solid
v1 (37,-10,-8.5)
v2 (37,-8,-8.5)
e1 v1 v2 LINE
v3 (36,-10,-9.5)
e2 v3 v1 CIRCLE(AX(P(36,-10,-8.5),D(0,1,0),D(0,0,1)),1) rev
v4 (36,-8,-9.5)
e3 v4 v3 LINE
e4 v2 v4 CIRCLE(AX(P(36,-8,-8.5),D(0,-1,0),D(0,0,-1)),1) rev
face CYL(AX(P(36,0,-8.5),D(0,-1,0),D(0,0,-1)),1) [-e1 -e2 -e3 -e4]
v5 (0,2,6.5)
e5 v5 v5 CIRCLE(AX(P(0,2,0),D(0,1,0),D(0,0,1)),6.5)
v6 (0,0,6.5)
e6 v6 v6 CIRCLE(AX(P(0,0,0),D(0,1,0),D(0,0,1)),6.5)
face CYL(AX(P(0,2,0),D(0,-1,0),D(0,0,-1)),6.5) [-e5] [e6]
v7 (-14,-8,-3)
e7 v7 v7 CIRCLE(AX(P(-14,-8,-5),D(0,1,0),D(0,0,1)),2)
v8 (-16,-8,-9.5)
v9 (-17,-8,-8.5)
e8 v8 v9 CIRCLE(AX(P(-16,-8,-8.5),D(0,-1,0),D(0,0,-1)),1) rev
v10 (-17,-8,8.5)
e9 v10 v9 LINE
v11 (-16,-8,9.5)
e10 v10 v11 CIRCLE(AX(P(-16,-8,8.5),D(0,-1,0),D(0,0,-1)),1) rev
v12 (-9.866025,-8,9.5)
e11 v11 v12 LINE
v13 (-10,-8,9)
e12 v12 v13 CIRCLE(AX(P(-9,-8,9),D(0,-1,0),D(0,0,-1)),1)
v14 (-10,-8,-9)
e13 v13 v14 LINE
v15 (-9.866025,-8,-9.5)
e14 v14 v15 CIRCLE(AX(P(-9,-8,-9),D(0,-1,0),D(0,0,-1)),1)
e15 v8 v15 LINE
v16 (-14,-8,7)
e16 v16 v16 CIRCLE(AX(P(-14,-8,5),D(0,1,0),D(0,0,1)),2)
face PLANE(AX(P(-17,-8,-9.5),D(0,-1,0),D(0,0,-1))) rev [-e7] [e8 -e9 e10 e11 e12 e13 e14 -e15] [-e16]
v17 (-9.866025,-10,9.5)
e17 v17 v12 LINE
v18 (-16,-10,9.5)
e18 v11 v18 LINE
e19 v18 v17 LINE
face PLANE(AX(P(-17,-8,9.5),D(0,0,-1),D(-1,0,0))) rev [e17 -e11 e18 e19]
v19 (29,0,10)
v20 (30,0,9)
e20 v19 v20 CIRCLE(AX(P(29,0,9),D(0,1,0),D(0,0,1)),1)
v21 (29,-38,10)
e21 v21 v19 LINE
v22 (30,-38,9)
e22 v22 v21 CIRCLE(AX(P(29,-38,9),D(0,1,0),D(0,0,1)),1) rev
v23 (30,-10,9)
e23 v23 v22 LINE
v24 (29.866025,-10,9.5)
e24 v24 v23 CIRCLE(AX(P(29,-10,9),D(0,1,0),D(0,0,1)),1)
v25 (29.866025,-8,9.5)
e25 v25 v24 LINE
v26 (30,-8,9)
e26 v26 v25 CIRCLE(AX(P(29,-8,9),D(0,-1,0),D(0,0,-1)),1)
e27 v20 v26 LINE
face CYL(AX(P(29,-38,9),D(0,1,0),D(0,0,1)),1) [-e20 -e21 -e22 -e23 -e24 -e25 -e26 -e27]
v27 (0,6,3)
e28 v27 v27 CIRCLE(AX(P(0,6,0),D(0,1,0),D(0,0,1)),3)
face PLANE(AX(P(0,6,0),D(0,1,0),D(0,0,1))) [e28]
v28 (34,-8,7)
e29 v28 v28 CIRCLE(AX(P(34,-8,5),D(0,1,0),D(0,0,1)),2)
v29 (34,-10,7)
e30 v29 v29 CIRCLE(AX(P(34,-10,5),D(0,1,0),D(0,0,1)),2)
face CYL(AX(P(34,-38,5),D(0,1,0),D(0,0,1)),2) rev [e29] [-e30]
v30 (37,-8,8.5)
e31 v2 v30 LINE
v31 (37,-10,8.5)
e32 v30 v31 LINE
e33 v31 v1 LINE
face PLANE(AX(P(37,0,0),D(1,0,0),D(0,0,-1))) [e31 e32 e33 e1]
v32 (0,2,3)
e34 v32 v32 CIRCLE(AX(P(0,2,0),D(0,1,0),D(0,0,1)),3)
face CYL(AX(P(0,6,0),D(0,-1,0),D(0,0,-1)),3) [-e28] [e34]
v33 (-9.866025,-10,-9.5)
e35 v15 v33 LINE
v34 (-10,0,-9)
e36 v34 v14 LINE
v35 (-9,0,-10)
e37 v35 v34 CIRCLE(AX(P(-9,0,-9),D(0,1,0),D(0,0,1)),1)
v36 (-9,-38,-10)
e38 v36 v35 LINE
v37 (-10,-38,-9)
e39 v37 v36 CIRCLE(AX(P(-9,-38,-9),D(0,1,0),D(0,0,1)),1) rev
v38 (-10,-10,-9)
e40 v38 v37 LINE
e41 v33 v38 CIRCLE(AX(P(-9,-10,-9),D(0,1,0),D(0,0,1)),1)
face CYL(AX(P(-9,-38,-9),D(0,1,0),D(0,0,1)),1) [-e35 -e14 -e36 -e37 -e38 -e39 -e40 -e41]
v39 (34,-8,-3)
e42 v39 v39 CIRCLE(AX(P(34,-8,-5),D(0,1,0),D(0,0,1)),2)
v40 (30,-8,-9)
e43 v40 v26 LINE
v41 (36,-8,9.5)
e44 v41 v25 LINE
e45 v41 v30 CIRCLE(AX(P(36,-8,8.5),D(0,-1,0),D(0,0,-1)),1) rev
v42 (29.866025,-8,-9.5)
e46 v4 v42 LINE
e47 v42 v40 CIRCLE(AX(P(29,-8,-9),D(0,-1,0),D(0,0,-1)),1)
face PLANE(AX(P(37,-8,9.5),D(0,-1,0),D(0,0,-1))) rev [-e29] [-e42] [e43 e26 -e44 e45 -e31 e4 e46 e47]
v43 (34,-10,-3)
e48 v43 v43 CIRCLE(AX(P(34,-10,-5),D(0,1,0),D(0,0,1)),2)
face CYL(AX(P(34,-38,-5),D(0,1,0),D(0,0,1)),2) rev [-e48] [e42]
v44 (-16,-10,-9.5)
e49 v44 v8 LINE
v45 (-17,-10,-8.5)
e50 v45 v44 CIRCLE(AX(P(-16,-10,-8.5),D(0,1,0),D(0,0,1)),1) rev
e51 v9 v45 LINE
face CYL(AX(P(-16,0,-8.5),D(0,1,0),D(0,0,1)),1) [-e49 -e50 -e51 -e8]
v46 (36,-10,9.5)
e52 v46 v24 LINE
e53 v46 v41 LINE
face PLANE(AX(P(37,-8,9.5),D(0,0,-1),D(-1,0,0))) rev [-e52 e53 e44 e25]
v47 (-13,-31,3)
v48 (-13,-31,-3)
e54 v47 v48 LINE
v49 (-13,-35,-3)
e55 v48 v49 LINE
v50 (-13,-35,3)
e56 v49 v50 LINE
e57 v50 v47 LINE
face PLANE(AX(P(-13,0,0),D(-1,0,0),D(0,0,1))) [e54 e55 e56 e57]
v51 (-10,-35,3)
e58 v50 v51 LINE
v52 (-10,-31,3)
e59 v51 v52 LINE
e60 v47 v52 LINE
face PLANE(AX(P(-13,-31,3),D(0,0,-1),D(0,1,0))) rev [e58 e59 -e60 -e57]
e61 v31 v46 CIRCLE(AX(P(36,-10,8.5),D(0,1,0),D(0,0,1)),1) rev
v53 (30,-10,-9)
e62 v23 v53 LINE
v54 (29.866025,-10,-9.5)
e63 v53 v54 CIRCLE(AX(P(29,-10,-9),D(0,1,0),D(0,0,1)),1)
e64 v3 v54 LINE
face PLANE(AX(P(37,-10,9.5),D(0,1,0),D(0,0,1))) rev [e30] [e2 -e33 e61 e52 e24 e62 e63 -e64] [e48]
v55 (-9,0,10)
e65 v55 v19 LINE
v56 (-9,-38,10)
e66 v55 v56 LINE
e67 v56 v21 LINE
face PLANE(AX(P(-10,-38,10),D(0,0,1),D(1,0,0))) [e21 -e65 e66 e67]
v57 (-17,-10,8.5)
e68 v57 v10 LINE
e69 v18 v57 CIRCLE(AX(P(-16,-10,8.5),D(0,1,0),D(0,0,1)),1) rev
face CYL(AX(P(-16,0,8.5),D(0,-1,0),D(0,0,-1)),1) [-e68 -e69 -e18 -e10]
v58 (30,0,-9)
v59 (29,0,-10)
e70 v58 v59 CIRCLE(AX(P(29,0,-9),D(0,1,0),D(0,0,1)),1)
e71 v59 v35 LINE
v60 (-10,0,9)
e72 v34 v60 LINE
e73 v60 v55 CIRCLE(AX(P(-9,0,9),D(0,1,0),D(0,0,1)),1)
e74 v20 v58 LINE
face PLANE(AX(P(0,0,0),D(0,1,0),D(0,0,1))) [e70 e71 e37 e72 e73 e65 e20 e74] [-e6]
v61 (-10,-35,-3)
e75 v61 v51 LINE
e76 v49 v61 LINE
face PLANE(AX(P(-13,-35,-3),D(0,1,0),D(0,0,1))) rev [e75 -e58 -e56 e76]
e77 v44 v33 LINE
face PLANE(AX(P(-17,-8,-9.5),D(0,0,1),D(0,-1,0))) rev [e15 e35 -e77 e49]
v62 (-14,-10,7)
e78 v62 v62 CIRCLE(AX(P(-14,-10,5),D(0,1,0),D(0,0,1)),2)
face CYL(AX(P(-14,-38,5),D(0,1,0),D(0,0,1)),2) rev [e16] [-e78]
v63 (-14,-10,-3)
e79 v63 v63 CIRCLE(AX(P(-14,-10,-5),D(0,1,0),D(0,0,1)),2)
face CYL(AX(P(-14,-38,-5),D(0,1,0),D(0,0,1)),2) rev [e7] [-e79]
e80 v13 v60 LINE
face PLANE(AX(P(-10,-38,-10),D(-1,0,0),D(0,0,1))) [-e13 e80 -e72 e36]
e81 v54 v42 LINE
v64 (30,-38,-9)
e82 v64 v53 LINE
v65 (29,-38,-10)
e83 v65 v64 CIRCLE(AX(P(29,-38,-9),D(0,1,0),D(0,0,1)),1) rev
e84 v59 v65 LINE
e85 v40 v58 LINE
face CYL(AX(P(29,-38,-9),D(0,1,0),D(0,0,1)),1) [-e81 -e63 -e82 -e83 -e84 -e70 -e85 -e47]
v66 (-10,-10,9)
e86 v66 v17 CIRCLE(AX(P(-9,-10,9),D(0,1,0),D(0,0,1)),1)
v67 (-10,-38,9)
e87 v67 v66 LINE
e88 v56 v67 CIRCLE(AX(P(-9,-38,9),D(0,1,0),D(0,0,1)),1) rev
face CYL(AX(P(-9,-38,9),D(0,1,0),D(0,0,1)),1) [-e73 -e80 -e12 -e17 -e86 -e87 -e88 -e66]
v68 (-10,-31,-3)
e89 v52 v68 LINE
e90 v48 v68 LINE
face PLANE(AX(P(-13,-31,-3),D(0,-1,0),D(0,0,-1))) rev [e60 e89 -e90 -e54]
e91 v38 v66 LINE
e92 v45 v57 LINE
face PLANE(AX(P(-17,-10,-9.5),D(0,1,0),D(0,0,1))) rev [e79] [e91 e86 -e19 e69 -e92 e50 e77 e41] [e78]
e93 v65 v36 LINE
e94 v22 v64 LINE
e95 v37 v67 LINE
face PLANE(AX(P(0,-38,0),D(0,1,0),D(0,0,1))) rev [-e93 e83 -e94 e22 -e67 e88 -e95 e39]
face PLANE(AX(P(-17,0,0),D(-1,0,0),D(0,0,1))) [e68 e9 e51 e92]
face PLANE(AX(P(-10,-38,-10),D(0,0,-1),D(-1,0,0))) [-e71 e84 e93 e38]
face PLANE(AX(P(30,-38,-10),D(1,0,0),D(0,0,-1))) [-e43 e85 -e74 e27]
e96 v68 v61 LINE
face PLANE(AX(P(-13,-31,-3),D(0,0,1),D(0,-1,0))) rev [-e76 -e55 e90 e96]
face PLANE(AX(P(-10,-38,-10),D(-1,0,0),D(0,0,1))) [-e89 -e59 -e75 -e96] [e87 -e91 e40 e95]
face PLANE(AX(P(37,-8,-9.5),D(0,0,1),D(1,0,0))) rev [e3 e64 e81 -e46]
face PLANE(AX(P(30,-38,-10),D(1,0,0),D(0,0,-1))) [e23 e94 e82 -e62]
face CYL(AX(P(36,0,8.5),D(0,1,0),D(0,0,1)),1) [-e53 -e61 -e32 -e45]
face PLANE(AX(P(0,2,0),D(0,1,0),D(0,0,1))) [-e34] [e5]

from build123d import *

# Parameters (mm, degrees)
SKETCH_1_W          = 40
SKETCH_1_H          = 20
EXTRUDE_455_DEPTH   = 38
SKETCH_2_R          = 6.5
EXTRUDE_589_DEPTH   = 2
SKETCH_3_R          = 3
EXTRUDE_676_DEPTH   = 4
SKETCH_4_W          = 19
SKETCH_4_H          = 2
EXTRUDE_1_DEPTH     = 7
SKETCH_6_W          = 19
SKETCH_6_H          = 2
EXTRUDE_2_DEPTH     = 7
SKETCH_7_R          = 2
CUT_EXTRUDE_1_DEPTH = 49.672374095
SKETCH_8_R          = 2
CUT_EXTRUDE_2_DEPTH = 49.672374095
SKETCH_9_W          = 6
SKETCH_9_H          = 4
EXTRUDE_1701_DEPTH  = 3
FILLET_1_R          = 1


with BuildPart() as part:
    # Эскиз1 → Extrude 455 (new body)
    with BuildSketch(Plane(origin=(0, 0, 0), x_dir=(1, 0, 0), z_dir=(0, 1, 0))):
        with Locations((10, 0)):
            Rectangle(SKETCH_1_W, SKETCH_1_H)
    extrude(amount=-EXTRUDE_455_DEPTH)

    # Эскиз2 → Extrude 589 (add)
    with BuildSketch(Plane(origin=(0, 0, 0), x_dir=(1, 0, 0), z_dir=(0, 1, 0))):
        with Locations(Location((0, 0, 0), (0, 0, 270))):
            Circle(SKETCH_2_R)
    extrude(amount=EXTRUDE_589_DEPTH)

    # Эскиз3 → Extrude 676 (add)
    with BuildSketch(Plane(origin=(0, 2, 0), x_dir=(1, 0, 0), z_dir=(0, 1, 0))):
        with Locations(Location((0, 0, 0), (0, 0, 270))):
            Circle(SKETCH_3_R)
    extrude(amount=EXTRUDE_676_DEPTH)

    # Эскиз4 → крепления 1 (add)
    with BuildSketch(Plane(origin=(30, 0, 0), x_dir=(0, 0, -1), z_dir=(1, 0, 0))):
        with Locations((0, -9)):
            Rectangle(SKETCH_4_W, SKETCH_4_H)
    extrude(amount=EXTRUDE_1_DEPTH)

    # Эскиз6 → крепления 2 (add)
    with BuildSketch(Plane.ZY.offset(10)):
        with Locations((0, -9)):
            Rectangle(SKETCH_6_W, SKETCH_6_H)
    extrude(amount=EXTRUDE_2_DEPTH)

    # Эскиз7 → отверстия 1 (cut, through all)
    with BuildSketch(Plane(origin=(0, -8, 0), x_dir=(1, 0, 0), z_dir=(0, 1, 0))):
        with Locations(Location((34, 5, 0), (0, 0, 270))):
            Circle(SKETCH_7_R)
        with Locations(Location((34, -5, 0), (0, 0, 270))):
            Circle(SKETCH_7_R)
    extrude(amount=-CUT_EXTRUDE_1_DEPTH, mode=Mode.SUBTRACT)

    # Эскиз8 → отверстия 2 (cut, through all)
    with BuildSketch(Plane(origin=(0, -8, 0), x_dir=(1, 0, 0), z_dir=(0, 1, 0))):
        with Locations(Location((-14, 5, 0), (0, 0, 270))):
            Circle(SKETCH_8_R)
        with Locations(Location((-14, -5, 0), (0, 0, 270))):
            Circle(SKETCH_8_R)
    extrude(amount=-CUT_EXTRUDE_2_DEPTH, mode=Mode.SUBTRACT)

    # Эскиз9 → Extrude 1701 (add)
    with BuildSketch(Plane.ZY.offset(10)):
        with Locations((0, -33)):
            Rectangle(SKETCH_9_W, SKETCH_9_H)
    extrude(amount=EXTRUDE_1701_DEPTH)

    # Скругление1
    # the kernel refuses this fillet: 1 mm, written as the material it takes off along each edge
    with BuildSketch(Plane(origin=(30, 2.5, 10), x_dir=(0, 0, -1), z_dir=(0, -1, 0))) as fillet_1_piece_1_section:
        with BuildLine():
            CenterArc((FILLET_1_R, -FILLET_1_R), FILLET_1_R, 90, 90)
            Line((0, -FILLET_1_R), (0, 0))
            Line((0, 0), (FILLET_1_R, 0))
        make_face()
    fillet_1_piece_1 = extrude(amount=43, mode=Mode.PRIVATE)
    fillet_1_piece_1 = split(fillet_1_piece_1, bisect_by=Plane(origin=(29.975991618, -8, 9.336749215), z_dir=(0, 1, 0)), keep=Keep.TOP, mode=Mode.PRIVATE)
    fillet_1_piece_1 = split(fillet_1_piece_1, bisect_by=Plane(origin=(29.975991618, -2.75, 9.5), z_dir=(0, 0, -1)), keep=Keep.TOP, mode=Mode.PRIVATE)
    add(fillet_1_piece_1, mode=Mode.SUBTRACT)
    with BuildSketch(Plane(origin=(30, 2.5, 10), x_dir=(0, 0, -1), z_dir=(0, -1, 0))) as fillet_1_piece_2_section:
        with BuildLine():
            CenterArc((FILLET_1_R, -FILLET_1_R), FILLET_1_R, 90, 90)
            Line((0, -FILLET_1_R), (0, 0))
            Line((0, 0), (FILLET_1_R, 0))
        make_face()
    fillet_1_piece_2 = extrude(amount=43, mode=Mode.PRIVATE)
    fillet_1_piece_2 = split(fillet_1_piece_2, bisect_by=Plane(origin=(29.74487994, -8, 9.835608236), z_dir=(0, 1, 0)), keep=Keep.TOP, mode=Mode.PRIVATE)
    fillet_1_piece_2 = split(fillet_1_piece_2, bisect_by=Plane(origin=(29.74487994, -2.75, 9.5), z_dir=(0, 0, 1)), keep=Keep.TOP, mode=Mode.PRIVATE)
    add(fillet_1_piece_2, mode=Mode.SUBTRACT)
    with BuildSketch(Plane(origin=(30, 2.5, 10), x_dir=(0, 0, -1), z_dir=(0, -1, 0))) as fillet_1_piece_3_section:
        with BuildLine():
            CenterArc((FILLET_1_R, -FILLET_1_R), FILLET_1_R, 90, 90)
            Line((0, -FILLET_1_R), (0, 0))
            Line((0, 0), (FILLET_1_R, 0))
        make_face()
    fillet_1_piece_3 = extrude(amount=43, mode=Mode.PRIVATE)
    fillet_1_piece_3 = split(fillet_1_piece_3, bisect_by=Plane(origin=(29.74487994, -8, 9.835608236), z_dir=(0, -1, 0)), keep=Keep.TOP, mode=Mode.PRIVATE)
    fillet_1_piece_3 = split(fillet_1_piece_3, bisect_by=Plane(origin=(29.74487994, -10, 9.835608236), z_dir=(0, 1, 0)), keep=Keep.TOP, mode=Mode.PRIVATE)
    fillet_1_piece_3 = split(fillet_1_piece_3, bisect_by=Plane(origin=(29.74487994, -9, 9.5), z_dir=(0, 0, 1)), keep=Keep.TOP, mode=Mode.PRIVATE)
    add(fillet_1_piece_3, mode=Mode.SUBTRACT)
    with BuildSketch(Plane(origin=(30, 2.5, 10), x_dir=(0, 0, -1), z_dir=(0, -1, 0))) as fillet_1_piece_4_section:
        with BuildLine():
            CenterArc((FILLET_1_R, -FILLET_1_R), FILLET_1_R, 90, 90)
            Line((0, -FILLET_1_R), (0, 0))
            Line((0, 0), (FILLET_1_R, 0))
        make_face()
    fillet_1_piece_4 = extrude(amount=43, mode=Mode.PRIVATE)
    fillet_1_piece_4 = split(fillet_1_piece_4, bisect_by=Plane(origin=(29.975991618, -10, 9.336749215), z_dir=(0, -1, 0)), keep=Keep.TOP, mode=Mode.PRIVATE)
    fillet_1_piece_4 = split(fillet_1_piece_4, bisect_by=Plane(origin=(29.975991618, -25.25, 9.5), z_dir=(0, 0, -1)), keep=Keep.TOP, mode=Mode.PRIVATE)
    add(fillet_1_piece_4, mode=Mode.SUBTRACT)
    with BuildSketch(Plane(origin=(30, 2.5, 10), x_dir=(0, 0, -1), z_dir=(0, -1, 0))) as fillet_1_piece_5_section:
        with BuildLine():
            CenterArc((FILLET_1_R, -FILLET_1_R), FILLET_1_R, 90, 90)
            Line((0, -FILLET_1_R), (0, 0))
            Line((0, 0), (FILLET_1_R, 0))
        make_face()
    fillet_1_piece_5 = extrude(amount=43, mode=Mode.PRIVATE)
    fillet_1_piece_5 = split(fillet_1_piece_5, bisect_by=Plane(origin=(29.74487994, -10, 9.835608236), z_dir=(0, -1, 0)), keep=Keep.TOP, mode=Mode.PRIVATE)
    fillet_1_piece_5 = split(fillet_1_piece_5, bisect_by=Plane(origin=(29.74487994, -25.25, 9.5), z_dir=(0, 0, 1)), keep=Keep.TOP, mode=Mode.PRIVATE)
    add(fillet_1_piece_5, mode=Mode.SUBTRACT)
    with BuildSketch(Plane(origin=(30, 2.5, -10), x_dir=(-1, 0, 0), z_dir=(0, -1, 0))) as fillet_1_piece_6_section:
        with BuildLine():
            CenterArc((FILLET_1_R, -FILLET_1_R), FILLET_1_R, 90, 90)
            Line((0, -FILLET_1_R), (0, 0))
            Line((0, 0), (FILLET_1_R, 0))
        make_face()
    fillet_1_piece_6 = extrude(amount=43, mode=Mode.PRIVATE)
    fillet_1_piece_6 = split(fillet_1_piece_6, bisect_by=Plane(origin=(29.74487994, -8, -9.835608236), z_dir=(0, 1, 0)), keep=Keep.TOP, mode=Mode.PRIVATE)
    fillet_1_piece_6 = split(fillet_1_piece_6, bisect_by=Plane(origin=(29.74487994, -2.75, -9.5), z_dir=(0, 0, -1)), keep=Keep.TOP, mode=Mode.PRIVATE)
    add(fillet_1_piece_6, mode=Mode.SUBTRACT)
    with BuildSketch(Plane(origin=(30, 2.5, -10), x_dir=(-1, 0, 0), z_dir=(0, -1, 0))) as fillet_1_piece_7_section:
        with BuildLine():
            CenterArc((FILLET_1_R, -FILLET_1_R), FILLET_1_R, 90, 90)
            Line((0, -FILLET_1_R), (0, 0))
            Line((0, 0), (FILLET_1_R, 0))
        make_face()
    fillet_1_piece_7 = extrude(amount=43, mode=Mode.PRIVATE)
    fillet_1_piece_7 = split(fillet_1_piece_7, bisect_by=Plane(origin=(29.975991618, -8, -9.336749215), z_dir=(0, 1, 0)), keep=Keep.TOP, mode=Mode.PRIVATE)
    fillet_1_piece_7 = split(fillet_1_piece_7, bisect_by=Plane(origin=(29.975991618, -2.75, -9.5), z_dir=(0, 0, 1)), keep=Keep.TOP, mode=Mode.PRIVATE)
    add(fillet_1_piece_7, mode=Mode.SUBTRACT)
    with BuildSketch(Plane(origin=(30, 2.5, -10), x_dir=(-1, 0, 0), z_dir=(0, -1, 0))) as fillet_1_piece_8_section:
        with BuildLine():
            CenterArc((FILLET_1_R, -FILLET_1_R), FILLET_1_R, 90, 90)
            Line((0, -FILLET_1_R), (0, 0))
            Line((0, 0), (FILLET_1_R, 0))
        make_face()
    fillet_1_piece_8 = extrude(amount=43, mode=Mode.PRIVATE)
    fillet_1_piece_8 = split(fillet_1_piece_8, bisect_by=Plane(origin=(29.74487994, -8, -9.835608236), z_dir=(0, -1, 0)), keep=Keep.TOP, mode=Mode.PRIVATE)
    fillet_1_piece_8 = split(fillet_1_piece_8, bisect_by=Plane(origin=(29.74487994, -9, -9.5), z_dir=(0, 0, -1)), keep=Keep.TOP, mode=Mode.PRIVATE)
    fillet_1_piece_8 = split(fillet_1_piece_8, bisect_by=Plane(origin=(29.74487994, -10, -9.835608236), z_dir=(0, 1, 0)), keep=Keep.TOP, mode=Mode.PRIVATE)
    add(fillet_1_piece_8, mode=Mode.SUBTRACT)
    with BuildSketch(Plane(origin=(30, 2.5, -10), x_dir=(-1, 0, 0), z_dir=(0, -1, 0))) as fillet_1_piece_9_section:
        with BuildLine():
            CenterArc((FILLET_1_R, -FILLET_1_R), FILLET_1_R, 90, 90)
            Line((0, -FILLET_1_R), (0, 0))
            Line((0, 0), (FILLET_1_R, 0))
        make_face()
    fillet_1_piece_9 = extrude(amount=43, mode=Mode.PRIVATE)
    fillet_1_piece_9 = split(fillet_1_piece_9, bisect_by=Plane(origin=(29.74487994, -25.25, -9.5), z_dir=(0, 0, -1)), keep=Keep.TOP, mode=Mode.PRIVATE)
    fillet_1_piece_9 = split(fillet_1_piece_9, bisect_by=Plane(origin=(29.74487994, -10, -9.835608236), z_dir=(0, -1, 0)), keep=Keep.TOP, mode=Mode.PRIVATE)
    add(fillet_1_piece_9, mode=Mode.SUBTRACT)
    with BuildSketch(Plane(origin=(30, 2.5, -10), x_dir=(-1, 0, 0), z_dir=(0, -1, 0))) as fillet_1_piece_10_section:
        with BuildLine():
            CenterArc((FILLET_1_R, -FILLET_1_R), FILLET_1_R, 90, 90)
            Line((0, -FILLET_1_R), (0, 0))
            Line((0, 0), (FILLET_1_R, 0))
        make_face()
    fillet_1_piece_10 = extrude(amount=43, mode=Mode.PRIVATE)
    fillet_1_piece_10 = split(fillet_1_piece_10, bisect_by=Plane(origin=(29.975991618, -25.25, -9.5), z_dir=(0, 0, 1)), keep=Keep.TOP, mode=Mode.PRIVATE)
    fillet_1_piece_10 = split(fillet_1_piece_10, bisect_by=Plane(origin=(29.975991618, -10, -9.336749215), z_dir=(0, -1, 0)), keep=Keep.TOP, mode=Mode.PRIVATE)
    add(fillet_1_piece_10, mode=Mode.SUBTRACT)
    with BuildSketch(Plane(origin=(37, -5.5, -9.5), x_dir=(-1, 0, 0), z_dir=(0, -1, 0)), Plane(origin=(37, -12.5, 9.5), x_dir=(-1, 0, 0), z_dir=(0, 1, 0)), Plane(origin=(-17, -12.5, -9.5), x_dir=(1, 0, 0), z_dir=(0, 1, 0)), Plane(origin=(-17, -5.5, 9.5), x_dir=(1, 0, 0), z_dir=(0, -1, 0))) as fillet_1_piece_11:
        with BuildLine():
            CenterArc((FILLET_1_R, -FILLET_1_R), FILLET_1_R, 90, 90)
            Line((0, -FILLET_1_R), (0, 0))
            Line((0, 0), (FILLET_1_R, 0))
        make_face()
    extrude(amount=7, mode=Mode.SUBTRACT)
    with BuildSketch(Plane(origin=(-10, 2.5, 10), x_dir=(0, 0, -1), z_dir=(0, -1, 0))) as fillet_1_piece_12_section:
        with BuildLine():
            CenterArc((FILLET_1_R, FILLET_1_R), FILLET_1_R, 180, 90)
            Line((0, FILLET_1_R), (0, 0))
            Line((0, 0), (FILLET_1_R, 0))
        make_face()
    fillet_1_piece_12 = extrude(amount=43, mode=Mode.PRIVATE)
    fillet_1_piece_12 = split(fillet_1_piece_12, bisect_by=Plane(origin=(-9.975991618, -8, 9.336749215), z_dir=(0, 1, 0)), keep=Keep.TOP, mode=Mode.PRIVATE)
    fillet_1_piece_12 = split(fillet_1_piece_12, bisect_by=Plane(origin=(-9.975991618, -2.75, 9.5), z_dir=(0, 0, -1)), keep=Keep.TOP, mode=Mode.PRIVATE)
    add(fillet_1_piece_12, mode=Mode.SUBTRACT)
    with BuildSketch(Plane(origin=(-10, 2.5, 10), x_dir=(0, 0, -1), z_dir=(0, -1, 0))) as fillet_1_piece_13_section:
        with BuildLine():
            CenterArc((FILLET_1_R, FILLET_1_R), FILLET_1_R, 180, 90)
            Line((0, FILLET_1_R), (0, 0))
            Line((0, 0), (FILLET_1_R, 0))
        make_face()
    fillet_1_piece_13 = extrude(amount=43, mode=Mode.PRIVATE)
    fillet_1_piece_13 = split(fillet_1_piece_13, bisect_by=Plane(origin=(-9.74487994, -8, 9.835608236), z_dir=(0, 1, 0)), keep=Keep.TOP, mode=Mode.PRIVATE)
    fillet_1_piece_13 = split(fillet_1_piece_13, bisect_by=Plane(origin=(-9.74487994, -2.75, 9.5), z_dir=(0, 0, 1)), keep=Keep.TOP, mode=Mode.PRIVATE)
    add(fillet_1_piece_13, mode=Mode.SUBTRACT)
    with BuildSketch(Plane(origin=(-10, 2.5, 10), x_dir=(0, 0, -1), z_dir=(0, -1, 0))) as fillet_1_piece_14_section:
        with BuildLine():
            CenterArc((FILLET_1_R, FILLET_1_R), FILLET_1_R, 180, 90)
            Line((0, FILLET_1_R), (0, 0))
            Line((0, 0), (FILLET_1_R, 0))
        make_face()
    fillet_1_piece_14 = extrude(amount=43, mode=Mode.PRIVATE)
    fillet_1_piece_14 = split(fillet_1_piece_14, bisect_by=Plane(origin=(-9.74487994, -8, 9.835608236), z_dir=(0, -1, 0)), keep=Keep.TOP, mode=Mode.PRIVATE)
    fillet_1_piece_14 = split(fillet_1_piece_14, bisect_by=Plane(origin=(-9.74487994, -9, 9.5), z_dir=(0, 0, 1)), keep=Keep.TOP, mode=Mode.PRIVATE)
    fillet_1_piece_14 = split(fillet_1_piece_14, bisect_by=Plane(origin=(-9.74487994, -10, 9.835608236), z_dir=(0, 1, 0)), keep=Keep.TOP, mode=Mode.PRIVATE)
    add(fillet_1_piece_14, mode=Mode.SUBTRACT)
    with BuildSketch(Plane(origin=(-10, 2.5, 10), x_dir=(0, 0, -1), z_dir=(0, -1, 0))) as fillet_1_piece_15_section:
        with BuildLine():
            CenterArc((FILLET_1_R, FILLET_1_R), FILLET_1_R, 180, 90)
            Line((0, FILLET_1_R), (0, 0))
            Line((0, 0), (FILLET_1_R, 0))
        make_face()
    fillet_1_piece_15 = extrude(amount=43, mode=Mode.PRIVATE)
    fillet_1_piece_15 = split(fillet_1_piece_15, bisect_by=Plane(origin=(-9.975991618, -25.25, 9.5), z_dir=(0, 0, -1)), keep=Keep.TOP, mode=Mode.PRIVATE)
    fillet_1_piece_15 = split(fillet_1_piece_15, bisect_by=Plane(origin=(-9.975991618, -10, 9.336749215), z_dir=(0, -1, 0)), keep=Keep.TOP, mode=Mode.PRIVATE)
    add(fillet_1_piece_15, mode=Mode.SUBTRACT)
    with BuildSketch(Plane(origin=(-10, 2.5, 10), x_dir=(0, 0, -1), z_dir=(0, -1, 0))) as fillet_1_piece_16_section:
        with BuildLine():
            CenterArc((FILLET_1_R, FILLET_1_R), FILLET_1_R, 180, 90)
            Line((0, FILLET_1_R), (0, 0))
            Line((0, 0), (FILLET_1_R, 0))
        make_face()
    fillet_1_piece_16 = extrude(amount=43, mode=Mode.PRIVATE)
    fillet_1_piece_16 = split(fillet_1_piece_16, bisect_by=Plane(origin=(-9.74487994, -25.25, 9.5), z_dir=(0, 0, 1)), keep=Keep.TOP, mode=Mode.PRIVATE)
    fillet_1_piece_16 = split(fillet_1_piece_16, bisect_by=Plane(origin=(-9.74487994, -10, 9.835608236), z_dir=(0, -1, 0)), keep=Keep.TOP, mode=Mode.PRIVATE)
    add(fillet_1_piece_16, mode=Mode.SUBTRACT)
    with BuildSketch(Plane(origin=(-10, 2.5, -10), x_dir=(1, 0, 0), z_dir=(0, -1, 0))) as fillet_1_piece_17_section:
        with BuildLine():
            CenterArc((FILLET_1_R, FILLET_1_R), FILLET_1_R, 180, 90)
            Line((0, FILLET_1_R), (0, 0))
            Line((0, 0), (FILLET_1_R, 0))
        make_face()
    fillet_1_piece_17 = extrude(amount=43, mode=Mode.PRIVATE)
    fillet_1_piece_17 = split(fillet_1_piece_17, bisect_by=Plane(origin=(-9.74487994, -8, -9.835608236), z_dir=(0, 1, 0)), keep=Keep.TOP, mode=Mode.PRIVATE)
    fillet_1_piece_17 = split(fillet_1_piece_17, bisect_by=Plane(origin=(-9.74487994, -2.75, -9.5), z_dir=(0, 0, -1)), keep=Keep.TOP, mode=Mode.PRIVATE)
    add(fillet_1_piece_17, mode=Mode.SUBTRACT)
    with BuildSketch(Plane(origin=(-10, 2.5, -10), x_dir=(1, 0, 0), z_dir=(0, -1, 0))) as fillet_1_piece_18_section:
        with BuildLine():
            CenterArc((FILLET_1_R, FILLET_1_R), FILLET_1_R, 180, 90)
            Line((0, FILLET_1_R), (0, 0))
            Line((0, 0), (FILLET_1_R, 0))
        make_face()
    fillet_1_piece_18 = extrude(amount=43, mode=Mode.PRIVATE)
    fillet_1_piece_18 = split(fillet_1_piece_18, bisect_by=Plane(origin=(-9.975991618, -8, -9.336749215), z_dir=(0, 1, 0)), keep=Keep.TOP, mode=Mode.PRIVATE)
    fillet_1_piece_18 = split(fillet_1_piece_18, bisect_by=Plane(origin=(-9.975991618, -2.75, -9.5), z_dir=(0, 0, 1)), keep=Keep.TOP, mode=Mode.PRIVATE)
    add(fillet_1_piece_18, mode=Mode.SUBTRACT)
    with BuildSketch(Plane(origin=(-10, 2.5, -10), x_dir=(1, 0, 0), z_dir=(0, -1, 0))) as fillet_1_piece_19_section:
        with BuildLine():
            CenterArc((FILLET_1_R, FILLET_1_R), FILLET_1_R, 180, 90)
            Line((0, FILLET_1_R), (0, 0))
            Line((0, 0), (FILLET_1_R, 0))
        make_face()
    fillet_1_piece_19 = extrude(amount=43, mode=Mode.PRIVATE)
    fillet_1_piece_19 = split(fillet_1_piece_19, bisect_by=Plane(origin=(-9.74487994, -8, -9.835608236), z_dir=(0, -1, 0)), keep=Keep.TOP, mode=Mode.PRIVATE)
    fillet_1_piece_19 = split(fillet_1_piece_19, bisect_by=Plane(origin=(-9.74487994, -9, -9.5), z_dir=(0, 0, -1)), keep=Keep.TOP, mode=Mode.PRIVATE)
    fillet_1_piece_19 = split(fillet_1_piece_19, bisect_by=Plane(origin=(-9.74487994, -10, -9.835608236), z_dir=(0, 1, 0)), keep=Keep.TOP, mode=Mode.PRIVATE)
    add(fillet_1_piece_19, mode=Mode.SUBTRACT)
    with BuildSketch(Plane(origin=(-10, 2.5, -10), x_dir=(1, 0, 0), z_dir=(0, -1, 0))) as fillet_1_piece_20_section:
        with BuildLine():
            CenterArc((FILLET_1_R, FILLET_1_R), FILLET_1_R, 180, 90)
            Line((0, FILLET_1_R), (0, 0))
            Line((0, 0), (FILLET_1_R, 0))
        make_face()
    fillet_1_piece_20 = extrude(amount=43, mode=Mode.PRIVATE)
    fillet_1_piece_20 = split(fillet_1_piece_20, bisect_by=Plane(origin=(-9.74487994, -25.25, -9.5), z_dir=(0, 0, -1)), keep=Keep.TOP, mode=Mode.PRIVATE)
    fillet_1_piece_20 = split(fillet_1_piece_20, bisect_by=Plane(origin=(-9.74487994, -10, -9.835608236), z_dir=(0, -1, 0)), keep=Keep.TOP, mode=Mode.PRIVATE)
    add(fillet_1_piece_20, mode=Mode.SUBTRACT)
    with BuildSketch(Plane(origin=(-10, 2.5, -10), x_dir=(1, 0, 0), z_dir=(0, -1, 0))) as fillet_1_piece_21_section:
        with BuildLine():
            CenterArc((FILLET_1_R, FILLET_1_R), FILLET_1_R, 180, 90)
            Line((0, FILLET_1_R), (0, 0))
            Line((0, 0), (FILLET_1_R, 0))
        make_face()
    fillet_1_piece_21 = extrude(amount=43, mode=Mode.PRIVATE)
    fillet_1_piece_21 = split(fillet_1_piece_21, bisect_by=Plane(origin=(-9.975991618, -25.25, -9.5), z_dir=(0, 0, 1)), keep=Keep.TOP, mode=Mode.PRIVATE)
    fillet_1_piece_21 = split(fillet_1_piece_21, bisect_by=Plane(origin=(-9.975991618, -10, -9.336749215), z_dir=(0, -1, 0)), keep=Keep.TOP, mode=Mode.PRIVATE)
    add(fillet_1_piece_21, mode=Mode.SUBTRACT)


solid = part.part
